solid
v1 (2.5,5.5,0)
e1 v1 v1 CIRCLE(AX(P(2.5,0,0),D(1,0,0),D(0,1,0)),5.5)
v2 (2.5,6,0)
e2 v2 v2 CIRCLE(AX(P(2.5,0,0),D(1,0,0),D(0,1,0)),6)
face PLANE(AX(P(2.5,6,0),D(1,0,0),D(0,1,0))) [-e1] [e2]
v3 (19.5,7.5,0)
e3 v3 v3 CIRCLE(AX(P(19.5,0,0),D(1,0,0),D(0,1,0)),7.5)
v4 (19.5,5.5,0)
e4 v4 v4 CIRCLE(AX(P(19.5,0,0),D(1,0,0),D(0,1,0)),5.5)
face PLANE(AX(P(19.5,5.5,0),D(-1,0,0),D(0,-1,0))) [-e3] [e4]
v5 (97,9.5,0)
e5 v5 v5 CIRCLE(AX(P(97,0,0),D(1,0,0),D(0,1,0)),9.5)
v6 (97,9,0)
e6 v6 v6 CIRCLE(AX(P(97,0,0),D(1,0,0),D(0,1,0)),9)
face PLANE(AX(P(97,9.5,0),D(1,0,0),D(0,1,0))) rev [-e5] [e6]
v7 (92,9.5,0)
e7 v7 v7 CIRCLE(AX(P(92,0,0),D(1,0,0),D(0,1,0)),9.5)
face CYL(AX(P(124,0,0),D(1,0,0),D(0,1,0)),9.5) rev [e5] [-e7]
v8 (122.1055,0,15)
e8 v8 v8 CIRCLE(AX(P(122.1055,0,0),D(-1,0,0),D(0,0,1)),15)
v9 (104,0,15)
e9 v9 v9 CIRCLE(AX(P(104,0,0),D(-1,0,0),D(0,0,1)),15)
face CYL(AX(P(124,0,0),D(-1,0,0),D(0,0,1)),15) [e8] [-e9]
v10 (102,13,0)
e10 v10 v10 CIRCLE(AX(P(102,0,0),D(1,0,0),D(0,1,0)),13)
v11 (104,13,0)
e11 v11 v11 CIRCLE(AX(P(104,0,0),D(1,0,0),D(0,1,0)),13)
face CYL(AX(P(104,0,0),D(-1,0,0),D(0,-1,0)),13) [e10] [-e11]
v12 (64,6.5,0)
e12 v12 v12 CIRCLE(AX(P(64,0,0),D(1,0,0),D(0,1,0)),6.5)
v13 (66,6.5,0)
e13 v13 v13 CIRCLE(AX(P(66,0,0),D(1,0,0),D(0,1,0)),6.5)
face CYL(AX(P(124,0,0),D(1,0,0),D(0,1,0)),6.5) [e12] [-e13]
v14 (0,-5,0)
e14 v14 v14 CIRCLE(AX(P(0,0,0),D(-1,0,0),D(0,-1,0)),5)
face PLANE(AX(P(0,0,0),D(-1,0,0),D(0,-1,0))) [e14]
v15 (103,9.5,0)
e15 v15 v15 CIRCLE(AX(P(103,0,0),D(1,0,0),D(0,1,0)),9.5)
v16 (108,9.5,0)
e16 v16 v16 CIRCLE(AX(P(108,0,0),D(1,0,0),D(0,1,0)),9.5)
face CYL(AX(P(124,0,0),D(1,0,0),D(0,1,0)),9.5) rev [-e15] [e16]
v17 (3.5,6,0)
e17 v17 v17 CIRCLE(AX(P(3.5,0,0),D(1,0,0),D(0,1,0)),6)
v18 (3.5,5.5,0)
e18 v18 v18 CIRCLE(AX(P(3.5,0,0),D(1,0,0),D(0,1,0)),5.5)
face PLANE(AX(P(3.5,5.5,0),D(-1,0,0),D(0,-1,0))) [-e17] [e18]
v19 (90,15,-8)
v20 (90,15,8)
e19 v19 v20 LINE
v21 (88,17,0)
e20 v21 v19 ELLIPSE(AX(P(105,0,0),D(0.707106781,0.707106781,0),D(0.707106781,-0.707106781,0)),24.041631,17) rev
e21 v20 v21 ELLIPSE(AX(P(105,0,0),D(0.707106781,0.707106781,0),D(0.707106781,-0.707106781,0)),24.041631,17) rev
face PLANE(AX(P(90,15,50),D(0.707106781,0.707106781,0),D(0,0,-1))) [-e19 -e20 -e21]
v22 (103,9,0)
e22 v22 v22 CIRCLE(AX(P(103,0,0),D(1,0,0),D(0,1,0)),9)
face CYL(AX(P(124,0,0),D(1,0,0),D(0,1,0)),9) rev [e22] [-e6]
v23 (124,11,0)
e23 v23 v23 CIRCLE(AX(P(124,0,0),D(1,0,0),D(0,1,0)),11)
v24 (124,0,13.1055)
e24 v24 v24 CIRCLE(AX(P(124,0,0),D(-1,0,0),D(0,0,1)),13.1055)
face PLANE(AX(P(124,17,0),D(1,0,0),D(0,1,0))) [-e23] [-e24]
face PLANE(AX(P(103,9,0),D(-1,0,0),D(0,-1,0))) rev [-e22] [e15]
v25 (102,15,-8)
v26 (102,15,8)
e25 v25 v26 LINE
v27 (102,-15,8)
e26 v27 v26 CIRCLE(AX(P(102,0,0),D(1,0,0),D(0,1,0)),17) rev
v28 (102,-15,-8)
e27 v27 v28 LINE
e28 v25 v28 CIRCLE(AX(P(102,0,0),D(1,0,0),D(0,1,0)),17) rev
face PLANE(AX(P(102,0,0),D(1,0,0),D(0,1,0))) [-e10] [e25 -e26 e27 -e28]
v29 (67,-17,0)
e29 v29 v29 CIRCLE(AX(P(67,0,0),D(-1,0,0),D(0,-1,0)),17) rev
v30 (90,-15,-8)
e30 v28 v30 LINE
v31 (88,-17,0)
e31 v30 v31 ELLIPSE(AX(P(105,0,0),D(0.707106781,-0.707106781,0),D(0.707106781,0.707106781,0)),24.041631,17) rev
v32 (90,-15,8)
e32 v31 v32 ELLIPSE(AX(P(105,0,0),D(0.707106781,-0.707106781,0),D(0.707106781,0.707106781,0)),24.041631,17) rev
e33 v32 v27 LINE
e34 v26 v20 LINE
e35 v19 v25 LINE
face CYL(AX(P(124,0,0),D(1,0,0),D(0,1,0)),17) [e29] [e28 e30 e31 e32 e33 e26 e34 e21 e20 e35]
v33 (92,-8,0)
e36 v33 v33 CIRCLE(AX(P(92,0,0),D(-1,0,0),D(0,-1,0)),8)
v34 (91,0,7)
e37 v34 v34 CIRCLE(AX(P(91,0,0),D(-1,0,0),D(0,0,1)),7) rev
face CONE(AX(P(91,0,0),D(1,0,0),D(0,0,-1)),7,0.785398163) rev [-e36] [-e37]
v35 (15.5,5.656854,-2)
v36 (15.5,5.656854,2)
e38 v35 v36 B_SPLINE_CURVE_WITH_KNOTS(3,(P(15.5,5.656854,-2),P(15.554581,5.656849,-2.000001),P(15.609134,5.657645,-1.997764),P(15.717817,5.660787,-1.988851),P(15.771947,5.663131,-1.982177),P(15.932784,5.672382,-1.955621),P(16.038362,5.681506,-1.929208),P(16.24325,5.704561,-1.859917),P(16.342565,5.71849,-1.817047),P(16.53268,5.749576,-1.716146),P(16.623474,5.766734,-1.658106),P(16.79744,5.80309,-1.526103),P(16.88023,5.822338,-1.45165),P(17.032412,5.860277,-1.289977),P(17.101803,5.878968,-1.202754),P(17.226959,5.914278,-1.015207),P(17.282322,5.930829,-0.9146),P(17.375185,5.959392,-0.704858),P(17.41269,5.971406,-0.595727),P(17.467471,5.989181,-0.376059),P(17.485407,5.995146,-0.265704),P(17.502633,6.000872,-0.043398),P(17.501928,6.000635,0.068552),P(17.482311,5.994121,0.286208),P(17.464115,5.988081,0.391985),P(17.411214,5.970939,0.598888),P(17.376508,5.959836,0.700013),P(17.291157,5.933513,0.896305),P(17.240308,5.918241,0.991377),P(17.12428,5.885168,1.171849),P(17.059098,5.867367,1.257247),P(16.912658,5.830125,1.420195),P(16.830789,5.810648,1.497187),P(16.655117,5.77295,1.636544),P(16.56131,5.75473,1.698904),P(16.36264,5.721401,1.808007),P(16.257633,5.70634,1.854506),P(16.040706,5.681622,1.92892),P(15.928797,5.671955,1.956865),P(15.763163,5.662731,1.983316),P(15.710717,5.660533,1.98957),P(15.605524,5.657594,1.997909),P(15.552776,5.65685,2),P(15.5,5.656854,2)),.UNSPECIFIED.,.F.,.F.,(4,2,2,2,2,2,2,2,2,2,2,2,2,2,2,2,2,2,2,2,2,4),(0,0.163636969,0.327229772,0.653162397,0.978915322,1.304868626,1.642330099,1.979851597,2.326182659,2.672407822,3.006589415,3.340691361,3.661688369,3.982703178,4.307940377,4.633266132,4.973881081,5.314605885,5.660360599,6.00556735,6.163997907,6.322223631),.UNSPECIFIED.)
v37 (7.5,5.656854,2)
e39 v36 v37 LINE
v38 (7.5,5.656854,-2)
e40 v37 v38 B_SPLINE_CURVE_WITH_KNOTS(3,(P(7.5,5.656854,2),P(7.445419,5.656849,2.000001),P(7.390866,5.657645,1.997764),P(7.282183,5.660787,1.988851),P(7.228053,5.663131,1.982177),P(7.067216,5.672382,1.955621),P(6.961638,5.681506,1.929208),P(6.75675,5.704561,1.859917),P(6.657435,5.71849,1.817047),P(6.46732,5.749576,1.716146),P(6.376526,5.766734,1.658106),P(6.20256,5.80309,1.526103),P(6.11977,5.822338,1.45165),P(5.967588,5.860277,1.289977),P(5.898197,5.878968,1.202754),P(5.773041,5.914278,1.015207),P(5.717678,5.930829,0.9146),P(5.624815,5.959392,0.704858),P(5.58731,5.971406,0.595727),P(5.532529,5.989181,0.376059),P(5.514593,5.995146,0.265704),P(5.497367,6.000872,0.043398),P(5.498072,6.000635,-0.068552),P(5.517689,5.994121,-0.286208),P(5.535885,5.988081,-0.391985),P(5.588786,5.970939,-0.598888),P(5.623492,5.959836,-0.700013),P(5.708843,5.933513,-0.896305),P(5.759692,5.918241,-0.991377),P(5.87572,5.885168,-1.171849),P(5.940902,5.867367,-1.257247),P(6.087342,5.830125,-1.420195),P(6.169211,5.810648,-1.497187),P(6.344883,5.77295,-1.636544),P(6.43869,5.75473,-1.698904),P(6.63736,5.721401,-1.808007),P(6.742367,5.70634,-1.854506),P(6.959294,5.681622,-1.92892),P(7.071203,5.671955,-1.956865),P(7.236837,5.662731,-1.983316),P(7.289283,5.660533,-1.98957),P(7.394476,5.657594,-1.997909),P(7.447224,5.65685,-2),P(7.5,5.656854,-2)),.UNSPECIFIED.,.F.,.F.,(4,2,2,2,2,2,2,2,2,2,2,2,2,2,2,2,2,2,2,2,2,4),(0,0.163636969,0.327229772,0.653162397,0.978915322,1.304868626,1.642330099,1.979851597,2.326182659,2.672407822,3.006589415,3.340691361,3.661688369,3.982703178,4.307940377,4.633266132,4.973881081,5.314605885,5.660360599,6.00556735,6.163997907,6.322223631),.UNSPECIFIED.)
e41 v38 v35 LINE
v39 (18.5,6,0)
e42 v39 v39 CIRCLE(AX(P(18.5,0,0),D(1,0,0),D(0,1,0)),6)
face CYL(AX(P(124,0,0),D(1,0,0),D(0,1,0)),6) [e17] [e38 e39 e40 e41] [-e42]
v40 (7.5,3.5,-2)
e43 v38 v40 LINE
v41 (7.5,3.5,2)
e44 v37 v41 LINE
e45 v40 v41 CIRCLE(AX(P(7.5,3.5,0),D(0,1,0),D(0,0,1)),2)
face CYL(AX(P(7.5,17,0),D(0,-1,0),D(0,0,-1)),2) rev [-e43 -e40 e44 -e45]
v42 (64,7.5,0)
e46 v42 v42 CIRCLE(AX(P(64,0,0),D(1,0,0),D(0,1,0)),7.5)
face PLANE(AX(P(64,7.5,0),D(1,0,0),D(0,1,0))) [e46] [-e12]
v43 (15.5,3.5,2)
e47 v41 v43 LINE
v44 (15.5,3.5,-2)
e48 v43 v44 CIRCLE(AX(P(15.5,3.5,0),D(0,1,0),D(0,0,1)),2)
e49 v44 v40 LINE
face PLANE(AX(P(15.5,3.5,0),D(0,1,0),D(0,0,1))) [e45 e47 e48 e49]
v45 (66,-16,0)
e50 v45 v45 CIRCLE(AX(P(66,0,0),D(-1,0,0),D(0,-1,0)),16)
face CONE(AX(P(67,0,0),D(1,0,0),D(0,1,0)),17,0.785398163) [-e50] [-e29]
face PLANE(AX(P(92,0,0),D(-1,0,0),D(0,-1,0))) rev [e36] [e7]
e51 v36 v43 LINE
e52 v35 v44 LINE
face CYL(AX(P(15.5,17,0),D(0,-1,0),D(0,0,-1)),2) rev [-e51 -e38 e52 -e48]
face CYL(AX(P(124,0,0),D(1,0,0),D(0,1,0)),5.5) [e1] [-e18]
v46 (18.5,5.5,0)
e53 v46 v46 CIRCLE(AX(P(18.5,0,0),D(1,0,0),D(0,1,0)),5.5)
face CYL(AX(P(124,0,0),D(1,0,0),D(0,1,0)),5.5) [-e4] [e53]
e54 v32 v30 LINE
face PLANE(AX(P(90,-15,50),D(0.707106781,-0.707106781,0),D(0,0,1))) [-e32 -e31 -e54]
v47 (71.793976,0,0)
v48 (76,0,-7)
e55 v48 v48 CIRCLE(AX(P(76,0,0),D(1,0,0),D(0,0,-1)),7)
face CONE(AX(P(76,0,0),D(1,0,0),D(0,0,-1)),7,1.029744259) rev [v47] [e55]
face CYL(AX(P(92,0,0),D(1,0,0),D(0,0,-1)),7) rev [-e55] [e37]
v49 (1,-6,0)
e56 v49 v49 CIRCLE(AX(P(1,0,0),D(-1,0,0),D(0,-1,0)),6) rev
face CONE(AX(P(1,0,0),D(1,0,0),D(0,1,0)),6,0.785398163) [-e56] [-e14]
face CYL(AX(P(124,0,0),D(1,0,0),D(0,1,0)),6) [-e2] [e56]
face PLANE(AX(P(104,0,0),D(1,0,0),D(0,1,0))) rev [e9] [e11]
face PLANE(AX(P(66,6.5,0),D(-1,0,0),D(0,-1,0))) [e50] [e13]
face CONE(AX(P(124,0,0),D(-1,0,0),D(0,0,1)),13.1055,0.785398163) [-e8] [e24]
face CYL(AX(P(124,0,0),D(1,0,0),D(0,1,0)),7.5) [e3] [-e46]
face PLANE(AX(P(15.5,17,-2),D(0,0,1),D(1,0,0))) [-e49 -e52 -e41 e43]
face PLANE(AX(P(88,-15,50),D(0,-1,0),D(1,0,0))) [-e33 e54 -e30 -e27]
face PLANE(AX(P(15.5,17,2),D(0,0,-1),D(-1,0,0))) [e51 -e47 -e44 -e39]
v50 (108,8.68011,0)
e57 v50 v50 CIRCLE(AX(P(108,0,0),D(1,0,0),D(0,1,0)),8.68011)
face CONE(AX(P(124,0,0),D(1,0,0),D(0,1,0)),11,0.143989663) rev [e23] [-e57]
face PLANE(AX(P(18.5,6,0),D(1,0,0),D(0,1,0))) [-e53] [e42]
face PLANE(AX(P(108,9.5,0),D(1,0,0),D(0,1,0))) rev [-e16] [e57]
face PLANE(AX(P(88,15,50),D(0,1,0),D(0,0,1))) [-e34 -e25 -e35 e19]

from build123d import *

# Parameters (mm, degrees)
CHAMFER_1_SIZE              = 1
CUT_EXTRUDE_START           = -22
SKETCH_2_OUTSIDE_W          = 62.6
SKETCH_2_OUTSIDE_H          = 62.6
SKETCH_2_OUTSIDE_R          = 13
CUT_EXTRUDE_1_DEPTH         = 2
CUT_EXTRUDE_START_2         = -14
CUT_EXTRUDE_2_DEPTH         = 14
CHAMFER_2_SIZE              = 2
CUT_EXTRUDE_START_3         = 3.5
CUT_EXTRUDE_3_DEPTH         = 123.809144562
HOLE_WIZARD_14_0_14_1_D     = 14
HOLE_WIZARD_14_0_14_1_DEPTH = 16
HOLE_WIZARD_14_0_14_1_TIP   = 4.206024333
CHAMFER_3_SIZE              = 1


# Read off the part's stored shape, not the designer's step: M30 机械螺纹 螺柱1, 切除-拉伸2
with BuildPart() as part:
    # 草图1 → 旋转1 (revolve)
    with BuildSketch(Plane.XY):
        Polygon((0, 0), (0, 6), (2.5, 6), (2.5, 5.5), (3.5, 5.5), (3.5, 6), (18.5, 6), (18.5, 5.5), (19.5, 5.5), (19.5, 7.5), (64, 7.5), (64, 6.5), (66, 6.5), (66, 17), (124, 17), (124, 0), align=None)
    revolve(axis=Axis((124, 0, 0), (-1, 0, 0)))

    # 倒角1
    chamfer_1_edges = [part.edges().sort_by_distance(p)[0] for p in [
        (66, -17, 0),
        (0, -6, 0),
    ]]
    chamfer(chamfer_1_edges, length=CHAMFER_1_SIZE)

    # 草图2 outside → 切除-拉伸1 (cut)
    with BuildSketch(Plane(origin=(124, 0, 0), x_dir=(0, 0, -1), z_dir=(1, 0, 0)).offset(CUT_EXTRUDE_START)):
        Rectangle(SKETCH_2_OUTSIDE_W, SKETCH_2_OUTSIDE_H)
        with Locations(Location((0, 0, 0), (0, 0, 90))):
            Circle(SKETCH_2_OUTSIDE_R, mode=Mode.SUBTRACT)
    extrude(amount=CUT_EXTRUDE_1_DEPTH, mode=Mode.SUBTRACT)

    # M30 机械螺纹 螺柱1 outline → M30 机械螺纹 螺柱1 (revolve, cut)
    with BuildSketch(Plane.YX):
        Polygon((17, 124), (13.1055, 124), (15, 122.1055), (15, 104), (17, 104), align=None)
    revolve(axis=Axis((0, 0, 0), (1, 0, 0)), mode=Mode.SUBTRACT)

    # 切除-拉伸2 outline → 切除-拉伸2 (cut)
    with BuildSketch(Plane(origin=(102, 0, 0), x_dir=(0, 0, -1), z_dir=(1, 0, 0)).offset(CUT_EXTRUDE_START_2)):
        with BuildLine():
            Line((-8, 15), (8, 15))
            ThreePointArc((8, 15), (0, 17), (-8, 15))
        make_face()
        with BuildLine():
            Line((8, -15), (-8, -15))
            ThreePointArc((-8, -15), (0, -17), (8, -15))
        make_face()
    extrude(amount=CUT_EXTRUDE_2_DEPTH, mode=Mode.SUBTRACT)

    # 倒角2
    chamfer_2_edges = [part.edges().sort_by_distance(p)[0] for p in [
        (88, -15, 0),
        (88, 15, 0),
    ]]
    chamfer(chamfer_2_edges, length=CHAMFER_2_SIZE - 0.0001)  # a hair under: the kernel refuses the full size

    # 草图5 → 切除-拉伸3 (cut, through all)
    with BuildSketch(Plane(origin=(0, 0, 0), x_dir=(1, 0, 0), z_dir=(0, 1, 0)).offset(CUT_EXTRUDE_START_3)):
        with BuildLine():
            Line((15.5, -2), (7.5, -2))
            ThreePointArc((7.5, -2), (5.5, 0), (7.5, 2))
            Line((7.5, 2), (15.5, 2))
            ThreePointArc((15.5, 2), (17.5, 0), (15.5, -2))
        make_face()
    extrude(amount=CUT_EXTRUDE_3_DEPTH, mode=Mode.SUBTRACT)

    # 草图6 → 切除-旋转1 (revolve, cut)
    with BuildSketch(Plane.XY):
        Polygon((92, 0), (92, 9.5), (97, 9.5), (97, 9), (103, 9), (103, 9.5), (108, 9.5), (108, 8.680110408), (124, 11), (124, 0), align=None)
    revolve(axis=Axis((124, 0, 0), (-1, 0, 0)), mode=Mode.SUBTRACT)

    # Ø14.0 (14) 直径孔1
    with Locations(Plane(origin=(92, 0, 0), x_dir=(0, 0, -1), z_dir=(1, 0, 0))):
        with Locations((0, 0)):
            Hole(HOLE_WIZARD_14_0_14_1_D / 2, depth=HOLE_WIZARD_14_0_14_1_DEPTH)
            with Locations((0, 0, -(HOLE_WIZARD_14_0_14_1_DEPTH + HOLE_WIZARD_14_0_14_1_TIP / 2))):  # 118° drill point
                Cone(0, HOLE_WIZARD_14_0_14_1_D / 2, HOLE_WIZARD_14_0_14_1_TIP, mode=Mode.SUBTRACT)

    # 倒角3
    chamfer_3_edges = [part.edges().sort_by_distance(p)[0] for p in [
        (92, 0, -7),
    ]]
    chamfer(chamfer_3_edges, length=CHAMFER_3_SIZE)


solid = part.part
